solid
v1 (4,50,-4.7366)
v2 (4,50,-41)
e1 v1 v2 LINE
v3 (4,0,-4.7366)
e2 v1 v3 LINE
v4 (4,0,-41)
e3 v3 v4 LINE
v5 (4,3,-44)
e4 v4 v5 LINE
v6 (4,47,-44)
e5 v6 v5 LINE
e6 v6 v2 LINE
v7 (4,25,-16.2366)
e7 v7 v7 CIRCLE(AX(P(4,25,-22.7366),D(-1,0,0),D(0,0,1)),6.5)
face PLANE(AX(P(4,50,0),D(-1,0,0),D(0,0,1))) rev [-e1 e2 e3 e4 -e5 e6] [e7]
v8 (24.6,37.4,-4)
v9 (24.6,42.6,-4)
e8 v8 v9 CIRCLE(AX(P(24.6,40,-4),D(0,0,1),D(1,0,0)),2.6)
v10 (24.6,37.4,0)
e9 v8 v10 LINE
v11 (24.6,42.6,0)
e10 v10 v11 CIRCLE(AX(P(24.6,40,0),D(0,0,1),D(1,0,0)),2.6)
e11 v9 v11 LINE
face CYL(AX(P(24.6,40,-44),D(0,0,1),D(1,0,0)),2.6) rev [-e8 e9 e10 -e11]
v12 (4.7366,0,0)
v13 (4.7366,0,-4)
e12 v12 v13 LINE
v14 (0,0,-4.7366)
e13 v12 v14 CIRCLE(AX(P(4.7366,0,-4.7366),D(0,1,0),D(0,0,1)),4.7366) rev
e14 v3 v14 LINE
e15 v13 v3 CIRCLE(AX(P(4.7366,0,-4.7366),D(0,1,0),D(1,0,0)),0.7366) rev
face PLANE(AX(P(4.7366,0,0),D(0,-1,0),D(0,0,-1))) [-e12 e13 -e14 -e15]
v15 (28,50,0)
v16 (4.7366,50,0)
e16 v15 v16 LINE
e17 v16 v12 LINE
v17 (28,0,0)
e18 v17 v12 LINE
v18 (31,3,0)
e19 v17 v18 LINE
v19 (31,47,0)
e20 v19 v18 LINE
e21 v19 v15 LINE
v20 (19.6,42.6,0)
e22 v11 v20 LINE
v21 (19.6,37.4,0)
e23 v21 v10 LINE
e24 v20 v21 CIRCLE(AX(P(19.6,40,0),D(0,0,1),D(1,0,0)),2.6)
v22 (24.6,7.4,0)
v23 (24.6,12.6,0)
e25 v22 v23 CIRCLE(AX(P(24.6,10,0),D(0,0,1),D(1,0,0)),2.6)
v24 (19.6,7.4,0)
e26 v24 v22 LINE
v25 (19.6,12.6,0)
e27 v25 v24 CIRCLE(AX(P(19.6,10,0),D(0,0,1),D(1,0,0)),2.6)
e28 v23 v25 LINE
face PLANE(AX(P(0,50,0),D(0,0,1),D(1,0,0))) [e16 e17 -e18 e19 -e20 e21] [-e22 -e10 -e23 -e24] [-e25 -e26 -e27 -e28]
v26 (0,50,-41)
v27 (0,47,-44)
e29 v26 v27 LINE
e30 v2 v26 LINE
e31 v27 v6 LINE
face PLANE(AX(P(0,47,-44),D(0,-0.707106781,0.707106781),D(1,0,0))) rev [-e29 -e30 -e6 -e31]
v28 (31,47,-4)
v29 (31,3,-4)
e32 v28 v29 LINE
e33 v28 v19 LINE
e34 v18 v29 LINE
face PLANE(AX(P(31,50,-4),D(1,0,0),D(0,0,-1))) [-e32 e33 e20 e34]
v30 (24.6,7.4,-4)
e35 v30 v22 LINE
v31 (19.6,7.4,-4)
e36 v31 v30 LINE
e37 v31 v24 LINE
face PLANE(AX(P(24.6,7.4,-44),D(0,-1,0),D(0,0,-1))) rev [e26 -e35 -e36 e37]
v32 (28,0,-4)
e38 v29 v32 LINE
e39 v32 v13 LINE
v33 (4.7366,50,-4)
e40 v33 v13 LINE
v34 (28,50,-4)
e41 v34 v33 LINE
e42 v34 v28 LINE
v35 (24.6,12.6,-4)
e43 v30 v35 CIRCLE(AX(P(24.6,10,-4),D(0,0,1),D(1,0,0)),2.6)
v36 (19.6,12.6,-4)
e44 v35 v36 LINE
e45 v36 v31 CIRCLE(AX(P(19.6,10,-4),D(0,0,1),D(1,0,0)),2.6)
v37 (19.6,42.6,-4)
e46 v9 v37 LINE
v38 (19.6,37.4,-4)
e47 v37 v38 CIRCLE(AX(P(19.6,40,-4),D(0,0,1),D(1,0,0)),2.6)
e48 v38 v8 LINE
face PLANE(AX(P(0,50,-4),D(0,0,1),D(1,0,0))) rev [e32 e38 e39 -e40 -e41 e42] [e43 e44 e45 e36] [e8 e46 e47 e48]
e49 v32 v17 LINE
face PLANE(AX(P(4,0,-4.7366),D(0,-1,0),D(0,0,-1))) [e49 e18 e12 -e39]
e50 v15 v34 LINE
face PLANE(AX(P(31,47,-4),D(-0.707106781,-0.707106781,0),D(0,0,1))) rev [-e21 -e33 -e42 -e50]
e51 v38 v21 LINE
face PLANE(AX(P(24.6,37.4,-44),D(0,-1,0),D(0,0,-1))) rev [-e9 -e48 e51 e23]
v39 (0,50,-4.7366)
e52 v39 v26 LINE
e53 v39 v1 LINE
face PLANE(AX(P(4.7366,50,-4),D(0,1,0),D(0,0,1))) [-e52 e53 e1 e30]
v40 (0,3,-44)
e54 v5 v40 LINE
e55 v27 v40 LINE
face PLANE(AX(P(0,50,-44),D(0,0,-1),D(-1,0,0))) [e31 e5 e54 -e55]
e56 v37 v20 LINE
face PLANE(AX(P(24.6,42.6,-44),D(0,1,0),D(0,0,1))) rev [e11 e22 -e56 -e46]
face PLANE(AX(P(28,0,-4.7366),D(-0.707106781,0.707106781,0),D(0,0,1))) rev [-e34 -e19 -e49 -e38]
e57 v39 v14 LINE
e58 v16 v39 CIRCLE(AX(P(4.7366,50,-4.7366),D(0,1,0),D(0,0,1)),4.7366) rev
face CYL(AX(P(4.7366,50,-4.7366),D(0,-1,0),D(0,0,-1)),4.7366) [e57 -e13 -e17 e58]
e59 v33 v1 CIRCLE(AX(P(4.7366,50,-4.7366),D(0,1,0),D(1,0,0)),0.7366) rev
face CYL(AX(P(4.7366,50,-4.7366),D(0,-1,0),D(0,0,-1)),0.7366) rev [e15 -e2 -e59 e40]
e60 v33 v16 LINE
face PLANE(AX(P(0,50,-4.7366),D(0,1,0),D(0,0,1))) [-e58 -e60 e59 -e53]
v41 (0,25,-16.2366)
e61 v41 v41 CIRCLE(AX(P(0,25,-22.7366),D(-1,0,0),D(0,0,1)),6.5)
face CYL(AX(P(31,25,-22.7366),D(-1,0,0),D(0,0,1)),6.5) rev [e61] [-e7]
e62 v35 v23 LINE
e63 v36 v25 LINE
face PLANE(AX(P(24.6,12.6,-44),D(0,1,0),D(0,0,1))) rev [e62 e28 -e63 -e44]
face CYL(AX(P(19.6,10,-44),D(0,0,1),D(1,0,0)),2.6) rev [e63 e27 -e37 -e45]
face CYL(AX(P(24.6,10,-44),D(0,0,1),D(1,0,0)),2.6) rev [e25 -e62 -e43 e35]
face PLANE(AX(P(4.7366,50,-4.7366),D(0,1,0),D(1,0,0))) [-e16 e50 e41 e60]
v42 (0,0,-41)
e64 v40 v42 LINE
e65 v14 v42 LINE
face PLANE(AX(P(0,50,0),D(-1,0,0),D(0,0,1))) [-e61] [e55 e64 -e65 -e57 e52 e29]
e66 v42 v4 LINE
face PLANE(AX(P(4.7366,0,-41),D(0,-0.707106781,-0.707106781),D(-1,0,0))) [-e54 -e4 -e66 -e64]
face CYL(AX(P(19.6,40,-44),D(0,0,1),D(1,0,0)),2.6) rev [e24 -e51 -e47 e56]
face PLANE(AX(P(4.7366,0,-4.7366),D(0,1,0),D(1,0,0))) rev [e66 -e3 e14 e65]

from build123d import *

# Parameters (mm, degrees)
SM_BASE_FLANGE_1_DEPTH = 50
SKETCH_3_R             = 6.5
CUT_EXTRUDE_2_DEPTH    = 74.464277033
CHAMFER_1_SIZE         = 3
CUT_EXTRUDE_3_DEPTH    = 74.464277033
PATTERN_LINEAR_1_COUNT = 2
PATTERN_LINEAR_1_PITCH = 30


# Sheet-metal steps are written as plain solids
with BuildPart() as part:
    # Sketch 1 → 基材-凸緣1 (new body)
    with BuildSketch(Plane(origin=(0, 0, 0), x_dir=(1, 0, 0), z_dir=(0, 1, 0))):
        with BuildLine():
            Line((31, 0), (4.7366, 0))
            ThreePointArc((4.7366, 0), (1.38731802, 1.38731802), (0, 4.7366))
            Line((0, 4.7366), (0, 44))
            Line((0, 44), (4, 44))
            Line((4, 44), (4, 4.7366))
            ThreePointArc((4, 4.7366), (4.215745145, 4.215745145), (4.7366, 4))
            Line((4.7366, 4), (31, 4))
            Line((31, 4), (31, 0))
        make_face()
    extrude(amount=SM_BASE_FLANGE_1_DEPTH)

    # Sketch 3 → 除料-伸長2 (cut, through all)
    with BuildSketch(Plane.ZY):
        with Locations((-22.7366, 25)):
            Circle(SKETCH_3_R)
    extrude(amount=-CUT_EXTRUDE_2_DEPTH, mode=Mode.SUBTRACT)

    # 導角1
    chamfer_1_edges = [part.edges().sort_by_distance(p)[0] for p in [
        (31, 50, -2),
        (31, 0, -2),
        (2, 50, -44),
        (2, 0, -44),
    ]]
    chamfer(chamfer_1_edges, length=CHAMFER_1_SIZE)

    # 草圖4 → 除料-伸長3 (cut, through all)
    with BuildSketch(Plane.XY):
        with BuildLine():
            Line((24.6, 7.4), (19.6, 7.4))
            ThreePointArc((19.6, 7.4), (17, 10), (19.6, 12.6))
            Line((19.6, 12.6), (24.6, 12.6))
            ThreePointArc((24.6, 12.6), (27.2, 10), (24.6, 7.4))
        make_face()
    cut_extrude_3 = extrude(amount=-CUT_EXTRUDE_3_DEPTH, mode=Mode.SUBTRACT)

    # 直線複製排列1: 除料-伸長3 ×2
    with Locations(*[(0, i * PATTERN_LINEAR_1_PITCH, 0) for i in range(1, PATTERN_LINEAR_1_COUNT)]):
        add(cut_extrude_3, mode=Mode.SUBTRACT)


solid = part.part
